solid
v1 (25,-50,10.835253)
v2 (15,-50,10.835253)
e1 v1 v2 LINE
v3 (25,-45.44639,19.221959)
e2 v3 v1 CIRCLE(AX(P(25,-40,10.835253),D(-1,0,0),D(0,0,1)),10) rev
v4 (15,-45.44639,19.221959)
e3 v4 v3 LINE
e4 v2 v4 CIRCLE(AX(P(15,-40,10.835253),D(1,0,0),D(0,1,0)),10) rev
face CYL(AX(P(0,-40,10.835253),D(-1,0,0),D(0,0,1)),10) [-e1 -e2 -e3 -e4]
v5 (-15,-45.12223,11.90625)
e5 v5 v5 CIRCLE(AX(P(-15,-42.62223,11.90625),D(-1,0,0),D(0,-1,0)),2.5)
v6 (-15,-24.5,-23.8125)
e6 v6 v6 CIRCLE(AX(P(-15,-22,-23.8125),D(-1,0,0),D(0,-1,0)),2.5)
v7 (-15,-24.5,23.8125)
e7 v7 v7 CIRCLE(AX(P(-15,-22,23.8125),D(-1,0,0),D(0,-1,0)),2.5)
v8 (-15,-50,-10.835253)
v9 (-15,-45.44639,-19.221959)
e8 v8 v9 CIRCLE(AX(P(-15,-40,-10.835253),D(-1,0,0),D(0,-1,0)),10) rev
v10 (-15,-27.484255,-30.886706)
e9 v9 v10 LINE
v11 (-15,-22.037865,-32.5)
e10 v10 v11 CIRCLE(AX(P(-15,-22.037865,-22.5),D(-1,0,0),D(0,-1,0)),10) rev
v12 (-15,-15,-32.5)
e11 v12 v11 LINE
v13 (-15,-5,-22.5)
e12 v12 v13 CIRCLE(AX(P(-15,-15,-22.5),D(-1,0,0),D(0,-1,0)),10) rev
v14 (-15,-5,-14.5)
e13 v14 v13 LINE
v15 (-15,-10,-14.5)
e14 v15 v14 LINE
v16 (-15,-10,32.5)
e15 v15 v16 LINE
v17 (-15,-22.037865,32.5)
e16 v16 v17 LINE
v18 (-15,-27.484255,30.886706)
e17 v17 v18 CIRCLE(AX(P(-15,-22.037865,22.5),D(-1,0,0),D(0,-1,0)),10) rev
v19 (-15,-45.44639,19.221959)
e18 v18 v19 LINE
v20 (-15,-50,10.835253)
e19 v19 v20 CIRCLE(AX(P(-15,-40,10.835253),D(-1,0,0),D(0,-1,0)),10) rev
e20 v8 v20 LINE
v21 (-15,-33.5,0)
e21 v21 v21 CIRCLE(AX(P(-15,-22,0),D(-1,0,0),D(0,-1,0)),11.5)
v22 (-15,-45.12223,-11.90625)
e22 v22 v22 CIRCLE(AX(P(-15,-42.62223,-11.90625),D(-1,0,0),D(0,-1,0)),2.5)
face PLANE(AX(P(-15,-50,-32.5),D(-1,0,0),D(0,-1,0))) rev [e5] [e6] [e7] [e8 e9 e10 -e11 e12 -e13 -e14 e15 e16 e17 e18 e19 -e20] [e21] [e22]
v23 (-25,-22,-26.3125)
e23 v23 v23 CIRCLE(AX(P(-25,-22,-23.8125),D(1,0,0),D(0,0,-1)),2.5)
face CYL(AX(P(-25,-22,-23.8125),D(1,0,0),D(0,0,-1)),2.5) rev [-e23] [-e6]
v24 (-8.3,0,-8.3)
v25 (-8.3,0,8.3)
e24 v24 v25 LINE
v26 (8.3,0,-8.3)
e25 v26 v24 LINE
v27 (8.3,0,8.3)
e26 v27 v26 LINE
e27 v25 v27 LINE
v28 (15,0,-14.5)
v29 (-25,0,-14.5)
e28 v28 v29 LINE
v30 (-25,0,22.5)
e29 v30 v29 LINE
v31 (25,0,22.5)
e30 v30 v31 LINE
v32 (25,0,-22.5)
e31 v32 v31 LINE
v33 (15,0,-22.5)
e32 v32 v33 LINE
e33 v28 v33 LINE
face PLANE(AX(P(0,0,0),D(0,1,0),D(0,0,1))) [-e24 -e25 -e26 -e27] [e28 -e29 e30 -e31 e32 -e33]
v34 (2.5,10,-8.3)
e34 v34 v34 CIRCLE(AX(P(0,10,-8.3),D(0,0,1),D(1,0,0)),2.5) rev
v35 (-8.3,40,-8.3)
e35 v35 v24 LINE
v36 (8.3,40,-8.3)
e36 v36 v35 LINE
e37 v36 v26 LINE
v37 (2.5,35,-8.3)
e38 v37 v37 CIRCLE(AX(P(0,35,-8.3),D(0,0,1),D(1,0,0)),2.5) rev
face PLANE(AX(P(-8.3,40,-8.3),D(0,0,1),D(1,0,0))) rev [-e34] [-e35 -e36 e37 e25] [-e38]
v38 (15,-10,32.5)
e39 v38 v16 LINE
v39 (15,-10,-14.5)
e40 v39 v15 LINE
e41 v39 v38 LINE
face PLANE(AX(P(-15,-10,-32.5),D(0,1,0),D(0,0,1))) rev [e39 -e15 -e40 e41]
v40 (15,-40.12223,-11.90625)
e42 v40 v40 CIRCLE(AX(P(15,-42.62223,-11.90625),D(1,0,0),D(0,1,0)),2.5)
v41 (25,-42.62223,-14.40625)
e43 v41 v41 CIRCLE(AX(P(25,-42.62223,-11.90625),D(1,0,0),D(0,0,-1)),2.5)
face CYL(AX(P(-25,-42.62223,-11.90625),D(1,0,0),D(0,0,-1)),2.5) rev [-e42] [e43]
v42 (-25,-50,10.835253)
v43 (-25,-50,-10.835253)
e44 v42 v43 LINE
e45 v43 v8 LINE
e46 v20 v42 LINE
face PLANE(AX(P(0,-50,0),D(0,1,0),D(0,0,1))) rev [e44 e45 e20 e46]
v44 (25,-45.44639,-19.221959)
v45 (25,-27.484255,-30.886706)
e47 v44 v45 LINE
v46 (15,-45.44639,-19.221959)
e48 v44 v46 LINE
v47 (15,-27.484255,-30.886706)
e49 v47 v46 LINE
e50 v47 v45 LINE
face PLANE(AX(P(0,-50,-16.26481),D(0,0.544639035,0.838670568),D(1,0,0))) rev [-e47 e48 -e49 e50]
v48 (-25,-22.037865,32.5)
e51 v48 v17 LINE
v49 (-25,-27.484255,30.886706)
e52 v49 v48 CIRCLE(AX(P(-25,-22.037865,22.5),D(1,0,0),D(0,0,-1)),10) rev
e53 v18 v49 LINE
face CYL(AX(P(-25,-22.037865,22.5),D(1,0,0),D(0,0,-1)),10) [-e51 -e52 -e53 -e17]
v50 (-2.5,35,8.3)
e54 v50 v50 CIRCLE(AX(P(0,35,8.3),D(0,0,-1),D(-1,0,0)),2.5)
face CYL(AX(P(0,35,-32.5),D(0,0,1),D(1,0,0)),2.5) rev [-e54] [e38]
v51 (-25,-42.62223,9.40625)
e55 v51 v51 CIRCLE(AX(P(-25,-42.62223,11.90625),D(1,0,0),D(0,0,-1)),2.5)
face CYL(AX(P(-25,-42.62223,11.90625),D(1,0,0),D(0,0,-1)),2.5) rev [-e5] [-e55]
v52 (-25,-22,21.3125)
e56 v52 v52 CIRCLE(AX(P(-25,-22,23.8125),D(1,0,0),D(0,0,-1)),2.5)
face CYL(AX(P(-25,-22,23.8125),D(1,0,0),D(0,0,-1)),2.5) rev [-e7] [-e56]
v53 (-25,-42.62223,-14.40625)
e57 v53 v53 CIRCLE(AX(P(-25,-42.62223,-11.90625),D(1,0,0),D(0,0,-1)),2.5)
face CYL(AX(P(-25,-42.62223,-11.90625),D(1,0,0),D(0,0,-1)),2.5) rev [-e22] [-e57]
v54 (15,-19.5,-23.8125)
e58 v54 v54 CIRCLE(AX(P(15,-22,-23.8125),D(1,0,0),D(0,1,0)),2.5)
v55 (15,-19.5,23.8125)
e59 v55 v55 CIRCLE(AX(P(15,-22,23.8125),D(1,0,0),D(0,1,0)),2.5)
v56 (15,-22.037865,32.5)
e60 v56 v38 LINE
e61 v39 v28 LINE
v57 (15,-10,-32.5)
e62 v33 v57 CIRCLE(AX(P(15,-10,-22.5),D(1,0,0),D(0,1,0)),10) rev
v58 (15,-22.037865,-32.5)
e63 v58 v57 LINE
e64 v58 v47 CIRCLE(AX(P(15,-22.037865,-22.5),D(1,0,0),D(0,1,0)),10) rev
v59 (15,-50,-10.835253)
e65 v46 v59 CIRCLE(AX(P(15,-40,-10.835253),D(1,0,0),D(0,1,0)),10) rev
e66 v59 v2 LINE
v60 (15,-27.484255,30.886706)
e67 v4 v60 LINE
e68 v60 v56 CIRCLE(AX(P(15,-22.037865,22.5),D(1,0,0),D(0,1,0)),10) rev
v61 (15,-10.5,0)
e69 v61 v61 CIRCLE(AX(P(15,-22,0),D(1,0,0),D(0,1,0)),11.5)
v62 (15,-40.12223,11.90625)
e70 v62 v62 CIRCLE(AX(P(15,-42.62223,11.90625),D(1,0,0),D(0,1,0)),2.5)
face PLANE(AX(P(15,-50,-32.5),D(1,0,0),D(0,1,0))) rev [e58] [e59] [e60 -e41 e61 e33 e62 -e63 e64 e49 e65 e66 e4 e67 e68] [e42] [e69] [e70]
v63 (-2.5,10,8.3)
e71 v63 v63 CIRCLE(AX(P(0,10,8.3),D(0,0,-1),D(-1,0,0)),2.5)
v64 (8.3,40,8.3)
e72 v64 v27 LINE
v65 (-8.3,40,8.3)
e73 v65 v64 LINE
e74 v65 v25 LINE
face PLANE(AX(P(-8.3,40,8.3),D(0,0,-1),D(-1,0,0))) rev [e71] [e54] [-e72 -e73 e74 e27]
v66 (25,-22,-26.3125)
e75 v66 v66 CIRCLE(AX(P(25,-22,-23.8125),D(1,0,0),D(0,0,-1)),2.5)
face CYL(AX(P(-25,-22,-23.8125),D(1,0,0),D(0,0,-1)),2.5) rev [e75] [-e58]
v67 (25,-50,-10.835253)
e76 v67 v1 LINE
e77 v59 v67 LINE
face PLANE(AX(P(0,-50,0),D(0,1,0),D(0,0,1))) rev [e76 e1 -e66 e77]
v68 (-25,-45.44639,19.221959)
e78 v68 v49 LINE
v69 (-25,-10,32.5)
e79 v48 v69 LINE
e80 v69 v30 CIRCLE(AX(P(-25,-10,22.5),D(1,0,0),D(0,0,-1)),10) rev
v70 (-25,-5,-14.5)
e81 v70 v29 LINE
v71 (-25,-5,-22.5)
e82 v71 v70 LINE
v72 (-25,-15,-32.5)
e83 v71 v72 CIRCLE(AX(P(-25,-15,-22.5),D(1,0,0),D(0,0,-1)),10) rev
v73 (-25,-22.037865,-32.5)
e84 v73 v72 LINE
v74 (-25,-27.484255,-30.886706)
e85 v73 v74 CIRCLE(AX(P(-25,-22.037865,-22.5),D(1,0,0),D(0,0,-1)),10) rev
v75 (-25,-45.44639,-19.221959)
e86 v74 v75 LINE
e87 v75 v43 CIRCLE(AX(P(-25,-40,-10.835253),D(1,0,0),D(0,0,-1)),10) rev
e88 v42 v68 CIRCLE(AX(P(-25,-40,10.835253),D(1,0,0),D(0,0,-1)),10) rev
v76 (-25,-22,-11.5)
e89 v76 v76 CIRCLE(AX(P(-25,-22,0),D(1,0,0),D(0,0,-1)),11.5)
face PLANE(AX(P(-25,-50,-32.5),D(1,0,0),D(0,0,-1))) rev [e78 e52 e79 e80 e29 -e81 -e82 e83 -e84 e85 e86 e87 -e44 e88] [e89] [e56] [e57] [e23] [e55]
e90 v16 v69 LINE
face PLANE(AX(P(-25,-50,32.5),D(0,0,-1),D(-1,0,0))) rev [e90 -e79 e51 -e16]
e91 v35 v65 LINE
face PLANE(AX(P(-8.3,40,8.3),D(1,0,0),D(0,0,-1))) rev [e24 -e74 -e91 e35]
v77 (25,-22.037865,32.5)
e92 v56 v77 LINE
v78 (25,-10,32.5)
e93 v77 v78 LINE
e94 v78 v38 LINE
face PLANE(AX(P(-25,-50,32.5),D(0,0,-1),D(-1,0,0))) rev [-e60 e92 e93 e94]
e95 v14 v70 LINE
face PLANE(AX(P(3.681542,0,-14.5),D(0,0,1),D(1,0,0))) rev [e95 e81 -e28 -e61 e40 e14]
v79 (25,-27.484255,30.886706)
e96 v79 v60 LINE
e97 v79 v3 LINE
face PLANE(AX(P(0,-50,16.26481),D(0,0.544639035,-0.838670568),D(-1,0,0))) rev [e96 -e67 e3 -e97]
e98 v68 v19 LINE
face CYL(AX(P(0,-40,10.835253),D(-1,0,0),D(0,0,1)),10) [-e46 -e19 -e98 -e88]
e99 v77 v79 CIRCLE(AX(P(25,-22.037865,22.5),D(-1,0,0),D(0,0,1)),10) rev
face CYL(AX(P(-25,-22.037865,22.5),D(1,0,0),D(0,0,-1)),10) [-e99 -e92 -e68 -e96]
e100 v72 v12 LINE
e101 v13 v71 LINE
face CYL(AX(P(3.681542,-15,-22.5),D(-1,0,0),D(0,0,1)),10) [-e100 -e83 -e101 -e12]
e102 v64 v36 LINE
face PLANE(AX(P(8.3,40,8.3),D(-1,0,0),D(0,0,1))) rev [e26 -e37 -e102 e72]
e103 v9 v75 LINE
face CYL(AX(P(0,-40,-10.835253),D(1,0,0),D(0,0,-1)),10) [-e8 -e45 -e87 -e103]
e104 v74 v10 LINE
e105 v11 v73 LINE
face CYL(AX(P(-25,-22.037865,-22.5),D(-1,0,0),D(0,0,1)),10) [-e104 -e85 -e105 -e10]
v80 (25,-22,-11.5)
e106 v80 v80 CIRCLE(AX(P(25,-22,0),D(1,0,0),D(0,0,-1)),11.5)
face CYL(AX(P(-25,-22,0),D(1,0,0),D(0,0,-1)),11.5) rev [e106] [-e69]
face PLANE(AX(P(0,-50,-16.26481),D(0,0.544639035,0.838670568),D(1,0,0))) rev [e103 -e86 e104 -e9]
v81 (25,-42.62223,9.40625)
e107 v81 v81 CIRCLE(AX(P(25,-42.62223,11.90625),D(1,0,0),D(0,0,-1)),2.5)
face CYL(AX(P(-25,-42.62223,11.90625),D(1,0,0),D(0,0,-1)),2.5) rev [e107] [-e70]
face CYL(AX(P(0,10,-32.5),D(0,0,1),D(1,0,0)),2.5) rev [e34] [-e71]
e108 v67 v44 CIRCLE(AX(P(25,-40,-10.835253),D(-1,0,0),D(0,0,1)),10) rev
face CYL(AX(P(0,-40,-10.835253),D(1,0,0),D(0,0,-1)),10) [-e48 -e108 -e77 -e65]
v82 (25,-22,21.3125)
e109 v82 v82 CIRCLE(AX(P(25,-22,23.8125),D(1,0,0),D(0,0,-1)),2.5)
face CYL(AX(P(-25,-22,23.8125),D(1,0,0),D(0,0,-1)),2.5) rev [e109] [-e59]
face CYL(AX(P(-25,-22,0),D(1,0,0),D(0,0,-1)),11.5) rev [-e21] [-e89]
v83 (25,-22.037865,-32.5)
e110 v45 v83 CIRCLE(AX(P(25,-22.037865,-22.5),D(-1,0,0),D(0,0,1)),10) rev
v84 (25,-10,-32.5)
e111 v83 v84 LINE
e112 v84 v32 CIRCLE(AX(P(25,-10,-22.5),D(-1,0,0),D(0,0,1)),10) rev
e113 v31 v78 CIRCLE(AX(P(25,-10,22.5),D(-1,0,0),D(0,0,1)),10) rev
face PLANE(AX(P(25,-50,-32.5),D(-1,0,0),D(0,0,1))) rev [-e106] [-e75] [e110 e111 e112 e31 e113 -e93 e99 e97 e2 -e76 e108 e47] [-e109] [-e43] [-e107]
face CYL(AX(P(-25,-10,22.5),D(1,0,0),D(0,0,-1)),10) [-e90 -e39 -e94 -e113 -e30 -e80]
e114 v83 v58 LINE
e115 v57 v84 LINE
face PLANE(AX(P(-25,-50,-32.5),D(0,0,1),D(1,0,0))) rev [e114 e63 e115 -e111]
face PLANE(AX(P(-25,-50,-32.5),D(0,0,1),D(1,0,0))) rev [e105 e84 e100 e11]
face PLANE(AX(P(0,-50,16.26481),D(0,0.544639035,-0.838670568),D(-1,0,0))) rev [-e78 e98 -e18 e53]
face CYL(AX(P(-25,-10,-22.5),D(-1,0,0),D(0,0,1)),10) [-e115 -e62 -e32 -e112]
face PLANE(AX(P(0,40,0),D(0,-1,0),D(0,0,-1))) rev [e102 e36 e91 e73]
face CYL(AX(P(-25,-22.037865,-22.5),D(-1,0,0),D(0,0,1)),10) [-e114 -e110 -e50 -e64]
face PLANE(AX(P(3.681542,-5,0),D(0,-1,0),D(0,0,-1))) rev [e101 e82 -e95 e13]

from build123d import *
from OCP.BRepFilletAPI import BRepFilletAPI_MakeChamfer

# Parameters (mm, degrees)
ESBO_O1_W                = 16.6
ESBO_O1_H                = 16.6
RESSALTO_EXTRUS_O1_DEPTH = 40
ESBO_O2_W                = 50
ESBO_O2_H                = 65
RESSALTO_EXTRUS_O2_DEPTH = 50
ESBO_O3_W                = 30
ESBO_O3_H                = 40
CORTE_EXTRUS_O1_DEPTH    = 86.732140997
ESBO_O4_R                = 11.5
ESBO_O4_R_2              = 2.5
CORTE_EXTRUS_O2_DEPTH    = 78.821912081
ESBO_O5_W                = 18
ESBO_O5_H                = 5
CORTE_EXTRUS_O3_DEPTH    = 10
CHANFRO1_SIZE            = 25
CHANFRO1_SIZE2           = 16.23518983
FILETE2_R                = 10
ESBO_O8_W                = 18
ESBO_O8_H                = 5
CORTE_EXTRUS_O5_DEPTH    = 30
FILETE4_R                = 10
ESBO_O9_R                = 2.5
CORTE_EXTRUS_O7_DEPTH    = 70.207225056


with BuildPart() as part:
    # Esboço1 → Ressalto-extrusão1 (new body)
    with BuildSketch(Plane(origin=(0, 0, 0), x_dir=(1, 0, 0), z_dir=(0, 1, 0))):
        Rectangle(ESBO_O1_W, ESBO_O1_H)
    extrude(amount=RESSALTO_EXTRUS_O1_DEPTH)

    # Esboço2 → Ressalto-extrusão2 (add)
    with BuildSketch(Plane.XZ):
        Rectangle(ESBO_O2_W, ESBO_O2_H)
    extrude(amount=RESSALTO_EXTRUS_O2_DEPTH)

    # Esboço3 → Corte-extrusão1 (cut, through all)
    with BuildSketch(Plane.XY.offset(32.5)):
        with Locations((0, -30)):
            Rectangle(ESBO_O3_W, ESBO_O3_H)
    extrude(amount=-CORTE_EXTRUS_O1_DEPTH, mode=Mode.SUBTRACT)

    # Esboço4 → Corte-extrusão2 (cut, through all)
    with BuildSketch(Plane(origin=(25, 0, 0), x_dir=(0, 0, -1), z_dir=(1, 0, 0))):
        with Locations((0, -22)):
            Circle(ESBO_O4_R)
        with Locations((-23.8125, -22)):
            Circle(ESBO_O4_R_2)
        with Locations((23.8125, -22)):
            Circle(ESBO_O4_R_2)
        with Locations((-11.90625, -42.622229928)):
            Circle(ESBO_O4_R_2)
        with Locations((11.90625, -42.622229928)):
            Circle(ESBO_O4_R_2)
    extrude(amount=-CORTE_EXTRUS_O2_DEPTH, mode=Mode.SUBTRACT)

    # Esboço5 → Corte-extrusão3 (cut)
    with BuildSketch(Plane.ZY.offset(25)):
        with Locations((-23.5, -2.5)):
            Rectangle(ESBO_O5_W, ESBO_O5_H)
    extrude(amount=-CORTE_EXTRUS_O3_DEPTH, mode=Mode.SUBTRACT)

    # Chanfro1: one chamfer whose edges measure the first distance from different faces: ONE call of the kernel's chamfer builder (chamfer() names one face for all edges)
    chanfro1_edges_1 = [part.edges().sort_by_distance(p)[0] for p in [
        (20, -50, 32.5),
        (-20, -50, 32.5),
    ]]
    chanfro1_side_1 = [part.faces().sort_by_distance(p)[0] for p in [
        (0, -0.707106781, 32.5),
    ]]
    chanfro1_edges_2 = [part.edges().sort_by_distance(p)[0] for p in [
        (-20, -50, -32.5),
        (20, -50, -32.5),
    ]]
    chanfro1_side_2 = [part.faces().sort_by_distance(p)[0] for p in [
        (5, -0.707106781, -32.5),
    ]]
    chanfro1 = BRepFilletAPI_MakeChamfer(part.part.solid().wrapped)
    for e in chanfro1_edges_1:
        chanfro1.Add(CHANFRO1_SIZE, CHANFRO1_SIZE2, e.wrapped, chanfro1_side_1[0].wrapped)  # the first distance lies on this face
    for e in chanfro1_edges_2:
        chanfro1.Add(CHANFRO1_SIZE, CHANFRO1_SIZE2, e.wrapped, chanfro1_side_2[0].wrapped)  # the first distance lies on this face
    add(Compound.cast(chanfro1.Shape()), mode=Mode.REPLACE)

    # Filete2
    # the kernel refuses this fillet: 10 mm, written as the material it takes off along each edge
    with BuildSketch(Plane(origin=(7.594662626, -25, -32.5), x_dir=(0, 1, 0), z_dir=(1, 0, 0)), Plane(origin=(-32.405337374, -25, -32.5), x_dir=(0, 1, 0), z_dir=(1, 0, 0)), Plane(origin=(32.405337374, -25, 32.5), x_dir=(0, 1, 0), z_dir=(-1, 0, 0)), Plane(origin=(-7.594662626, -25, 32.5), x_dir=(0, 1, 0), z_dir=(-1, 0, 0))) as filete2_piece_1:
        with BuildLine():
            CenterArc((FILETE2_R * 0.296213494962, FILETE2_R), FILETE2_R, 237, 33)
            Line((-FILETE2_R * 0.248425540053, FILETE2_R * 0.161329432055), (0, 0))
            Line((0, 0), (FILETE2_R * 0.296213494962, 0))
        make_face()
    extrude(amount=24.810674748, mode=Mode.SUBTRACT)
    with BuildSketch(Plane(origin=(1.426107509, -50, -16.26481017), x_dir=(0, 0.8386705679454236, -0.5446390350150278), z_dir=(1, 0, 0)), Plane(origin=(-1.426107509, -50, 16.26481017), x_dir=(0, 0.8386705679454233, 0.5446390350150284), z_dir=(-1, 0, 0)), Plane(origin=(-38.573892491, -50, -16.26481017), x_dir=(0, 0.8386705679454236, -0.5446390350150278), z_dir=(1, 0, 0))) as filete2_piece_2:
        with BuildLine():
            CenterArc((FILETE2_R * 0.542955699638, FILETE2_R), FILETE2_R, 213, 57)
            Line((-FILETE2_R * 0.295714868307, FILETE2_R * 0.455360964985), (0, 0))
            Line((0, 0), (FILETE2_R * 0.542955699638, 0))
        make_face()
    extrude(amount=37.147784982, mode=Mode.SUBTRACT)
    with BuildSketch(Plane(origin=(38.573892491, -50, 16.26481017), x_dir=(0, 0, -1), z_dir=(-1, 0, 0))) as filete2_piece_3:
        with BuildLine():
            CenterArc((FILETE2_R * 0.542955699638, -FILETE2_R), FILETE2_R, 90, 57)
            Line((-FILETE2_R * 0.295714868307, -FILETE2_R * 0.455360964985), (0, 0))
            Line((0, 0), (FILETE2_R * 0.542955699638, 0))
        make_face()
    extrude(amount=37.147784982, mode=Mode.SUBTRACT)
    with BuildSketch(Plane(origin=(50, 0, 32.5), x_dir=(0, 0, -1), z_dir=(-1, 0, 0))) as filete2_piece_4:
        with BuildLine():
            CenterArc((FILETE2_R, FILETE2_R), FILETE2_R, 180, 90)
            Line((0, FILETE2_R), (0, 0))
            Line((0, 0), (FILETE2_R, 0))
        make_face()
    extrude(amount=100, mode=Mode.SUBTRACT)
    with BuildSketch(Plane(origin=(-50, -5, -32.5), x_dir=(0, -1, 0), z_dir=(1, 0, 0))) as filete2_piece_5:
        with BuildLine():
            CenterArc((FILETE2_R, -FILETE2_R), FILETE2_R, 90, 90)
            Line((0, -FILETE2_R), (0, 0))
            Line((0, 0), (FILETE2_R, 0))
        make_face()
    extrude(amount=35, mode=Mode.SUBTRACT)

    # Esboço8 → Corte-extrusão5 (cut)
    with BuildSketch(Plane.ZY.offset(15)):
        with Locations((-23.5, -2.5)):
            Rectangle(ESBO_O8_W, ESBO_O8_H)
        with Locations((-23.5, -7.5)):
            Rectangle(ESBO_O8_W, ESBO_O8_H)
    extrude(amount=-CORTE_EXTRUS_O5_DEPTH, mode=Mode.SUBTRACT)

    # Filete4
    filete4_edges = [part.edges().sort_by_distance(p)[0] for p in [
        (20, 0, -32.5),
    ]]
    fillet(filete4_edges, radius=FILETE4_R)

    # Esboço9 → Corte-extrusão7 (cut, through all)
    with BuildSketch(Plane(origin=(0, 0, 8.3), x_dir=(-1, 0, 0), z_dir=(0, 0, -1))):
        with Locations(Location((0, 10, 0), (0, 0, 180))):
            Circle(ESBO_O9_R)
        with Locations(Location((0, 35, 0), (0, 0, 180))):
            Circle(ESBO_O9_R)
    extrude(amount=CORTE_EXTRUS_O7_DEPTH, mode=Mode.SUBTRACT)


solid = part.part
